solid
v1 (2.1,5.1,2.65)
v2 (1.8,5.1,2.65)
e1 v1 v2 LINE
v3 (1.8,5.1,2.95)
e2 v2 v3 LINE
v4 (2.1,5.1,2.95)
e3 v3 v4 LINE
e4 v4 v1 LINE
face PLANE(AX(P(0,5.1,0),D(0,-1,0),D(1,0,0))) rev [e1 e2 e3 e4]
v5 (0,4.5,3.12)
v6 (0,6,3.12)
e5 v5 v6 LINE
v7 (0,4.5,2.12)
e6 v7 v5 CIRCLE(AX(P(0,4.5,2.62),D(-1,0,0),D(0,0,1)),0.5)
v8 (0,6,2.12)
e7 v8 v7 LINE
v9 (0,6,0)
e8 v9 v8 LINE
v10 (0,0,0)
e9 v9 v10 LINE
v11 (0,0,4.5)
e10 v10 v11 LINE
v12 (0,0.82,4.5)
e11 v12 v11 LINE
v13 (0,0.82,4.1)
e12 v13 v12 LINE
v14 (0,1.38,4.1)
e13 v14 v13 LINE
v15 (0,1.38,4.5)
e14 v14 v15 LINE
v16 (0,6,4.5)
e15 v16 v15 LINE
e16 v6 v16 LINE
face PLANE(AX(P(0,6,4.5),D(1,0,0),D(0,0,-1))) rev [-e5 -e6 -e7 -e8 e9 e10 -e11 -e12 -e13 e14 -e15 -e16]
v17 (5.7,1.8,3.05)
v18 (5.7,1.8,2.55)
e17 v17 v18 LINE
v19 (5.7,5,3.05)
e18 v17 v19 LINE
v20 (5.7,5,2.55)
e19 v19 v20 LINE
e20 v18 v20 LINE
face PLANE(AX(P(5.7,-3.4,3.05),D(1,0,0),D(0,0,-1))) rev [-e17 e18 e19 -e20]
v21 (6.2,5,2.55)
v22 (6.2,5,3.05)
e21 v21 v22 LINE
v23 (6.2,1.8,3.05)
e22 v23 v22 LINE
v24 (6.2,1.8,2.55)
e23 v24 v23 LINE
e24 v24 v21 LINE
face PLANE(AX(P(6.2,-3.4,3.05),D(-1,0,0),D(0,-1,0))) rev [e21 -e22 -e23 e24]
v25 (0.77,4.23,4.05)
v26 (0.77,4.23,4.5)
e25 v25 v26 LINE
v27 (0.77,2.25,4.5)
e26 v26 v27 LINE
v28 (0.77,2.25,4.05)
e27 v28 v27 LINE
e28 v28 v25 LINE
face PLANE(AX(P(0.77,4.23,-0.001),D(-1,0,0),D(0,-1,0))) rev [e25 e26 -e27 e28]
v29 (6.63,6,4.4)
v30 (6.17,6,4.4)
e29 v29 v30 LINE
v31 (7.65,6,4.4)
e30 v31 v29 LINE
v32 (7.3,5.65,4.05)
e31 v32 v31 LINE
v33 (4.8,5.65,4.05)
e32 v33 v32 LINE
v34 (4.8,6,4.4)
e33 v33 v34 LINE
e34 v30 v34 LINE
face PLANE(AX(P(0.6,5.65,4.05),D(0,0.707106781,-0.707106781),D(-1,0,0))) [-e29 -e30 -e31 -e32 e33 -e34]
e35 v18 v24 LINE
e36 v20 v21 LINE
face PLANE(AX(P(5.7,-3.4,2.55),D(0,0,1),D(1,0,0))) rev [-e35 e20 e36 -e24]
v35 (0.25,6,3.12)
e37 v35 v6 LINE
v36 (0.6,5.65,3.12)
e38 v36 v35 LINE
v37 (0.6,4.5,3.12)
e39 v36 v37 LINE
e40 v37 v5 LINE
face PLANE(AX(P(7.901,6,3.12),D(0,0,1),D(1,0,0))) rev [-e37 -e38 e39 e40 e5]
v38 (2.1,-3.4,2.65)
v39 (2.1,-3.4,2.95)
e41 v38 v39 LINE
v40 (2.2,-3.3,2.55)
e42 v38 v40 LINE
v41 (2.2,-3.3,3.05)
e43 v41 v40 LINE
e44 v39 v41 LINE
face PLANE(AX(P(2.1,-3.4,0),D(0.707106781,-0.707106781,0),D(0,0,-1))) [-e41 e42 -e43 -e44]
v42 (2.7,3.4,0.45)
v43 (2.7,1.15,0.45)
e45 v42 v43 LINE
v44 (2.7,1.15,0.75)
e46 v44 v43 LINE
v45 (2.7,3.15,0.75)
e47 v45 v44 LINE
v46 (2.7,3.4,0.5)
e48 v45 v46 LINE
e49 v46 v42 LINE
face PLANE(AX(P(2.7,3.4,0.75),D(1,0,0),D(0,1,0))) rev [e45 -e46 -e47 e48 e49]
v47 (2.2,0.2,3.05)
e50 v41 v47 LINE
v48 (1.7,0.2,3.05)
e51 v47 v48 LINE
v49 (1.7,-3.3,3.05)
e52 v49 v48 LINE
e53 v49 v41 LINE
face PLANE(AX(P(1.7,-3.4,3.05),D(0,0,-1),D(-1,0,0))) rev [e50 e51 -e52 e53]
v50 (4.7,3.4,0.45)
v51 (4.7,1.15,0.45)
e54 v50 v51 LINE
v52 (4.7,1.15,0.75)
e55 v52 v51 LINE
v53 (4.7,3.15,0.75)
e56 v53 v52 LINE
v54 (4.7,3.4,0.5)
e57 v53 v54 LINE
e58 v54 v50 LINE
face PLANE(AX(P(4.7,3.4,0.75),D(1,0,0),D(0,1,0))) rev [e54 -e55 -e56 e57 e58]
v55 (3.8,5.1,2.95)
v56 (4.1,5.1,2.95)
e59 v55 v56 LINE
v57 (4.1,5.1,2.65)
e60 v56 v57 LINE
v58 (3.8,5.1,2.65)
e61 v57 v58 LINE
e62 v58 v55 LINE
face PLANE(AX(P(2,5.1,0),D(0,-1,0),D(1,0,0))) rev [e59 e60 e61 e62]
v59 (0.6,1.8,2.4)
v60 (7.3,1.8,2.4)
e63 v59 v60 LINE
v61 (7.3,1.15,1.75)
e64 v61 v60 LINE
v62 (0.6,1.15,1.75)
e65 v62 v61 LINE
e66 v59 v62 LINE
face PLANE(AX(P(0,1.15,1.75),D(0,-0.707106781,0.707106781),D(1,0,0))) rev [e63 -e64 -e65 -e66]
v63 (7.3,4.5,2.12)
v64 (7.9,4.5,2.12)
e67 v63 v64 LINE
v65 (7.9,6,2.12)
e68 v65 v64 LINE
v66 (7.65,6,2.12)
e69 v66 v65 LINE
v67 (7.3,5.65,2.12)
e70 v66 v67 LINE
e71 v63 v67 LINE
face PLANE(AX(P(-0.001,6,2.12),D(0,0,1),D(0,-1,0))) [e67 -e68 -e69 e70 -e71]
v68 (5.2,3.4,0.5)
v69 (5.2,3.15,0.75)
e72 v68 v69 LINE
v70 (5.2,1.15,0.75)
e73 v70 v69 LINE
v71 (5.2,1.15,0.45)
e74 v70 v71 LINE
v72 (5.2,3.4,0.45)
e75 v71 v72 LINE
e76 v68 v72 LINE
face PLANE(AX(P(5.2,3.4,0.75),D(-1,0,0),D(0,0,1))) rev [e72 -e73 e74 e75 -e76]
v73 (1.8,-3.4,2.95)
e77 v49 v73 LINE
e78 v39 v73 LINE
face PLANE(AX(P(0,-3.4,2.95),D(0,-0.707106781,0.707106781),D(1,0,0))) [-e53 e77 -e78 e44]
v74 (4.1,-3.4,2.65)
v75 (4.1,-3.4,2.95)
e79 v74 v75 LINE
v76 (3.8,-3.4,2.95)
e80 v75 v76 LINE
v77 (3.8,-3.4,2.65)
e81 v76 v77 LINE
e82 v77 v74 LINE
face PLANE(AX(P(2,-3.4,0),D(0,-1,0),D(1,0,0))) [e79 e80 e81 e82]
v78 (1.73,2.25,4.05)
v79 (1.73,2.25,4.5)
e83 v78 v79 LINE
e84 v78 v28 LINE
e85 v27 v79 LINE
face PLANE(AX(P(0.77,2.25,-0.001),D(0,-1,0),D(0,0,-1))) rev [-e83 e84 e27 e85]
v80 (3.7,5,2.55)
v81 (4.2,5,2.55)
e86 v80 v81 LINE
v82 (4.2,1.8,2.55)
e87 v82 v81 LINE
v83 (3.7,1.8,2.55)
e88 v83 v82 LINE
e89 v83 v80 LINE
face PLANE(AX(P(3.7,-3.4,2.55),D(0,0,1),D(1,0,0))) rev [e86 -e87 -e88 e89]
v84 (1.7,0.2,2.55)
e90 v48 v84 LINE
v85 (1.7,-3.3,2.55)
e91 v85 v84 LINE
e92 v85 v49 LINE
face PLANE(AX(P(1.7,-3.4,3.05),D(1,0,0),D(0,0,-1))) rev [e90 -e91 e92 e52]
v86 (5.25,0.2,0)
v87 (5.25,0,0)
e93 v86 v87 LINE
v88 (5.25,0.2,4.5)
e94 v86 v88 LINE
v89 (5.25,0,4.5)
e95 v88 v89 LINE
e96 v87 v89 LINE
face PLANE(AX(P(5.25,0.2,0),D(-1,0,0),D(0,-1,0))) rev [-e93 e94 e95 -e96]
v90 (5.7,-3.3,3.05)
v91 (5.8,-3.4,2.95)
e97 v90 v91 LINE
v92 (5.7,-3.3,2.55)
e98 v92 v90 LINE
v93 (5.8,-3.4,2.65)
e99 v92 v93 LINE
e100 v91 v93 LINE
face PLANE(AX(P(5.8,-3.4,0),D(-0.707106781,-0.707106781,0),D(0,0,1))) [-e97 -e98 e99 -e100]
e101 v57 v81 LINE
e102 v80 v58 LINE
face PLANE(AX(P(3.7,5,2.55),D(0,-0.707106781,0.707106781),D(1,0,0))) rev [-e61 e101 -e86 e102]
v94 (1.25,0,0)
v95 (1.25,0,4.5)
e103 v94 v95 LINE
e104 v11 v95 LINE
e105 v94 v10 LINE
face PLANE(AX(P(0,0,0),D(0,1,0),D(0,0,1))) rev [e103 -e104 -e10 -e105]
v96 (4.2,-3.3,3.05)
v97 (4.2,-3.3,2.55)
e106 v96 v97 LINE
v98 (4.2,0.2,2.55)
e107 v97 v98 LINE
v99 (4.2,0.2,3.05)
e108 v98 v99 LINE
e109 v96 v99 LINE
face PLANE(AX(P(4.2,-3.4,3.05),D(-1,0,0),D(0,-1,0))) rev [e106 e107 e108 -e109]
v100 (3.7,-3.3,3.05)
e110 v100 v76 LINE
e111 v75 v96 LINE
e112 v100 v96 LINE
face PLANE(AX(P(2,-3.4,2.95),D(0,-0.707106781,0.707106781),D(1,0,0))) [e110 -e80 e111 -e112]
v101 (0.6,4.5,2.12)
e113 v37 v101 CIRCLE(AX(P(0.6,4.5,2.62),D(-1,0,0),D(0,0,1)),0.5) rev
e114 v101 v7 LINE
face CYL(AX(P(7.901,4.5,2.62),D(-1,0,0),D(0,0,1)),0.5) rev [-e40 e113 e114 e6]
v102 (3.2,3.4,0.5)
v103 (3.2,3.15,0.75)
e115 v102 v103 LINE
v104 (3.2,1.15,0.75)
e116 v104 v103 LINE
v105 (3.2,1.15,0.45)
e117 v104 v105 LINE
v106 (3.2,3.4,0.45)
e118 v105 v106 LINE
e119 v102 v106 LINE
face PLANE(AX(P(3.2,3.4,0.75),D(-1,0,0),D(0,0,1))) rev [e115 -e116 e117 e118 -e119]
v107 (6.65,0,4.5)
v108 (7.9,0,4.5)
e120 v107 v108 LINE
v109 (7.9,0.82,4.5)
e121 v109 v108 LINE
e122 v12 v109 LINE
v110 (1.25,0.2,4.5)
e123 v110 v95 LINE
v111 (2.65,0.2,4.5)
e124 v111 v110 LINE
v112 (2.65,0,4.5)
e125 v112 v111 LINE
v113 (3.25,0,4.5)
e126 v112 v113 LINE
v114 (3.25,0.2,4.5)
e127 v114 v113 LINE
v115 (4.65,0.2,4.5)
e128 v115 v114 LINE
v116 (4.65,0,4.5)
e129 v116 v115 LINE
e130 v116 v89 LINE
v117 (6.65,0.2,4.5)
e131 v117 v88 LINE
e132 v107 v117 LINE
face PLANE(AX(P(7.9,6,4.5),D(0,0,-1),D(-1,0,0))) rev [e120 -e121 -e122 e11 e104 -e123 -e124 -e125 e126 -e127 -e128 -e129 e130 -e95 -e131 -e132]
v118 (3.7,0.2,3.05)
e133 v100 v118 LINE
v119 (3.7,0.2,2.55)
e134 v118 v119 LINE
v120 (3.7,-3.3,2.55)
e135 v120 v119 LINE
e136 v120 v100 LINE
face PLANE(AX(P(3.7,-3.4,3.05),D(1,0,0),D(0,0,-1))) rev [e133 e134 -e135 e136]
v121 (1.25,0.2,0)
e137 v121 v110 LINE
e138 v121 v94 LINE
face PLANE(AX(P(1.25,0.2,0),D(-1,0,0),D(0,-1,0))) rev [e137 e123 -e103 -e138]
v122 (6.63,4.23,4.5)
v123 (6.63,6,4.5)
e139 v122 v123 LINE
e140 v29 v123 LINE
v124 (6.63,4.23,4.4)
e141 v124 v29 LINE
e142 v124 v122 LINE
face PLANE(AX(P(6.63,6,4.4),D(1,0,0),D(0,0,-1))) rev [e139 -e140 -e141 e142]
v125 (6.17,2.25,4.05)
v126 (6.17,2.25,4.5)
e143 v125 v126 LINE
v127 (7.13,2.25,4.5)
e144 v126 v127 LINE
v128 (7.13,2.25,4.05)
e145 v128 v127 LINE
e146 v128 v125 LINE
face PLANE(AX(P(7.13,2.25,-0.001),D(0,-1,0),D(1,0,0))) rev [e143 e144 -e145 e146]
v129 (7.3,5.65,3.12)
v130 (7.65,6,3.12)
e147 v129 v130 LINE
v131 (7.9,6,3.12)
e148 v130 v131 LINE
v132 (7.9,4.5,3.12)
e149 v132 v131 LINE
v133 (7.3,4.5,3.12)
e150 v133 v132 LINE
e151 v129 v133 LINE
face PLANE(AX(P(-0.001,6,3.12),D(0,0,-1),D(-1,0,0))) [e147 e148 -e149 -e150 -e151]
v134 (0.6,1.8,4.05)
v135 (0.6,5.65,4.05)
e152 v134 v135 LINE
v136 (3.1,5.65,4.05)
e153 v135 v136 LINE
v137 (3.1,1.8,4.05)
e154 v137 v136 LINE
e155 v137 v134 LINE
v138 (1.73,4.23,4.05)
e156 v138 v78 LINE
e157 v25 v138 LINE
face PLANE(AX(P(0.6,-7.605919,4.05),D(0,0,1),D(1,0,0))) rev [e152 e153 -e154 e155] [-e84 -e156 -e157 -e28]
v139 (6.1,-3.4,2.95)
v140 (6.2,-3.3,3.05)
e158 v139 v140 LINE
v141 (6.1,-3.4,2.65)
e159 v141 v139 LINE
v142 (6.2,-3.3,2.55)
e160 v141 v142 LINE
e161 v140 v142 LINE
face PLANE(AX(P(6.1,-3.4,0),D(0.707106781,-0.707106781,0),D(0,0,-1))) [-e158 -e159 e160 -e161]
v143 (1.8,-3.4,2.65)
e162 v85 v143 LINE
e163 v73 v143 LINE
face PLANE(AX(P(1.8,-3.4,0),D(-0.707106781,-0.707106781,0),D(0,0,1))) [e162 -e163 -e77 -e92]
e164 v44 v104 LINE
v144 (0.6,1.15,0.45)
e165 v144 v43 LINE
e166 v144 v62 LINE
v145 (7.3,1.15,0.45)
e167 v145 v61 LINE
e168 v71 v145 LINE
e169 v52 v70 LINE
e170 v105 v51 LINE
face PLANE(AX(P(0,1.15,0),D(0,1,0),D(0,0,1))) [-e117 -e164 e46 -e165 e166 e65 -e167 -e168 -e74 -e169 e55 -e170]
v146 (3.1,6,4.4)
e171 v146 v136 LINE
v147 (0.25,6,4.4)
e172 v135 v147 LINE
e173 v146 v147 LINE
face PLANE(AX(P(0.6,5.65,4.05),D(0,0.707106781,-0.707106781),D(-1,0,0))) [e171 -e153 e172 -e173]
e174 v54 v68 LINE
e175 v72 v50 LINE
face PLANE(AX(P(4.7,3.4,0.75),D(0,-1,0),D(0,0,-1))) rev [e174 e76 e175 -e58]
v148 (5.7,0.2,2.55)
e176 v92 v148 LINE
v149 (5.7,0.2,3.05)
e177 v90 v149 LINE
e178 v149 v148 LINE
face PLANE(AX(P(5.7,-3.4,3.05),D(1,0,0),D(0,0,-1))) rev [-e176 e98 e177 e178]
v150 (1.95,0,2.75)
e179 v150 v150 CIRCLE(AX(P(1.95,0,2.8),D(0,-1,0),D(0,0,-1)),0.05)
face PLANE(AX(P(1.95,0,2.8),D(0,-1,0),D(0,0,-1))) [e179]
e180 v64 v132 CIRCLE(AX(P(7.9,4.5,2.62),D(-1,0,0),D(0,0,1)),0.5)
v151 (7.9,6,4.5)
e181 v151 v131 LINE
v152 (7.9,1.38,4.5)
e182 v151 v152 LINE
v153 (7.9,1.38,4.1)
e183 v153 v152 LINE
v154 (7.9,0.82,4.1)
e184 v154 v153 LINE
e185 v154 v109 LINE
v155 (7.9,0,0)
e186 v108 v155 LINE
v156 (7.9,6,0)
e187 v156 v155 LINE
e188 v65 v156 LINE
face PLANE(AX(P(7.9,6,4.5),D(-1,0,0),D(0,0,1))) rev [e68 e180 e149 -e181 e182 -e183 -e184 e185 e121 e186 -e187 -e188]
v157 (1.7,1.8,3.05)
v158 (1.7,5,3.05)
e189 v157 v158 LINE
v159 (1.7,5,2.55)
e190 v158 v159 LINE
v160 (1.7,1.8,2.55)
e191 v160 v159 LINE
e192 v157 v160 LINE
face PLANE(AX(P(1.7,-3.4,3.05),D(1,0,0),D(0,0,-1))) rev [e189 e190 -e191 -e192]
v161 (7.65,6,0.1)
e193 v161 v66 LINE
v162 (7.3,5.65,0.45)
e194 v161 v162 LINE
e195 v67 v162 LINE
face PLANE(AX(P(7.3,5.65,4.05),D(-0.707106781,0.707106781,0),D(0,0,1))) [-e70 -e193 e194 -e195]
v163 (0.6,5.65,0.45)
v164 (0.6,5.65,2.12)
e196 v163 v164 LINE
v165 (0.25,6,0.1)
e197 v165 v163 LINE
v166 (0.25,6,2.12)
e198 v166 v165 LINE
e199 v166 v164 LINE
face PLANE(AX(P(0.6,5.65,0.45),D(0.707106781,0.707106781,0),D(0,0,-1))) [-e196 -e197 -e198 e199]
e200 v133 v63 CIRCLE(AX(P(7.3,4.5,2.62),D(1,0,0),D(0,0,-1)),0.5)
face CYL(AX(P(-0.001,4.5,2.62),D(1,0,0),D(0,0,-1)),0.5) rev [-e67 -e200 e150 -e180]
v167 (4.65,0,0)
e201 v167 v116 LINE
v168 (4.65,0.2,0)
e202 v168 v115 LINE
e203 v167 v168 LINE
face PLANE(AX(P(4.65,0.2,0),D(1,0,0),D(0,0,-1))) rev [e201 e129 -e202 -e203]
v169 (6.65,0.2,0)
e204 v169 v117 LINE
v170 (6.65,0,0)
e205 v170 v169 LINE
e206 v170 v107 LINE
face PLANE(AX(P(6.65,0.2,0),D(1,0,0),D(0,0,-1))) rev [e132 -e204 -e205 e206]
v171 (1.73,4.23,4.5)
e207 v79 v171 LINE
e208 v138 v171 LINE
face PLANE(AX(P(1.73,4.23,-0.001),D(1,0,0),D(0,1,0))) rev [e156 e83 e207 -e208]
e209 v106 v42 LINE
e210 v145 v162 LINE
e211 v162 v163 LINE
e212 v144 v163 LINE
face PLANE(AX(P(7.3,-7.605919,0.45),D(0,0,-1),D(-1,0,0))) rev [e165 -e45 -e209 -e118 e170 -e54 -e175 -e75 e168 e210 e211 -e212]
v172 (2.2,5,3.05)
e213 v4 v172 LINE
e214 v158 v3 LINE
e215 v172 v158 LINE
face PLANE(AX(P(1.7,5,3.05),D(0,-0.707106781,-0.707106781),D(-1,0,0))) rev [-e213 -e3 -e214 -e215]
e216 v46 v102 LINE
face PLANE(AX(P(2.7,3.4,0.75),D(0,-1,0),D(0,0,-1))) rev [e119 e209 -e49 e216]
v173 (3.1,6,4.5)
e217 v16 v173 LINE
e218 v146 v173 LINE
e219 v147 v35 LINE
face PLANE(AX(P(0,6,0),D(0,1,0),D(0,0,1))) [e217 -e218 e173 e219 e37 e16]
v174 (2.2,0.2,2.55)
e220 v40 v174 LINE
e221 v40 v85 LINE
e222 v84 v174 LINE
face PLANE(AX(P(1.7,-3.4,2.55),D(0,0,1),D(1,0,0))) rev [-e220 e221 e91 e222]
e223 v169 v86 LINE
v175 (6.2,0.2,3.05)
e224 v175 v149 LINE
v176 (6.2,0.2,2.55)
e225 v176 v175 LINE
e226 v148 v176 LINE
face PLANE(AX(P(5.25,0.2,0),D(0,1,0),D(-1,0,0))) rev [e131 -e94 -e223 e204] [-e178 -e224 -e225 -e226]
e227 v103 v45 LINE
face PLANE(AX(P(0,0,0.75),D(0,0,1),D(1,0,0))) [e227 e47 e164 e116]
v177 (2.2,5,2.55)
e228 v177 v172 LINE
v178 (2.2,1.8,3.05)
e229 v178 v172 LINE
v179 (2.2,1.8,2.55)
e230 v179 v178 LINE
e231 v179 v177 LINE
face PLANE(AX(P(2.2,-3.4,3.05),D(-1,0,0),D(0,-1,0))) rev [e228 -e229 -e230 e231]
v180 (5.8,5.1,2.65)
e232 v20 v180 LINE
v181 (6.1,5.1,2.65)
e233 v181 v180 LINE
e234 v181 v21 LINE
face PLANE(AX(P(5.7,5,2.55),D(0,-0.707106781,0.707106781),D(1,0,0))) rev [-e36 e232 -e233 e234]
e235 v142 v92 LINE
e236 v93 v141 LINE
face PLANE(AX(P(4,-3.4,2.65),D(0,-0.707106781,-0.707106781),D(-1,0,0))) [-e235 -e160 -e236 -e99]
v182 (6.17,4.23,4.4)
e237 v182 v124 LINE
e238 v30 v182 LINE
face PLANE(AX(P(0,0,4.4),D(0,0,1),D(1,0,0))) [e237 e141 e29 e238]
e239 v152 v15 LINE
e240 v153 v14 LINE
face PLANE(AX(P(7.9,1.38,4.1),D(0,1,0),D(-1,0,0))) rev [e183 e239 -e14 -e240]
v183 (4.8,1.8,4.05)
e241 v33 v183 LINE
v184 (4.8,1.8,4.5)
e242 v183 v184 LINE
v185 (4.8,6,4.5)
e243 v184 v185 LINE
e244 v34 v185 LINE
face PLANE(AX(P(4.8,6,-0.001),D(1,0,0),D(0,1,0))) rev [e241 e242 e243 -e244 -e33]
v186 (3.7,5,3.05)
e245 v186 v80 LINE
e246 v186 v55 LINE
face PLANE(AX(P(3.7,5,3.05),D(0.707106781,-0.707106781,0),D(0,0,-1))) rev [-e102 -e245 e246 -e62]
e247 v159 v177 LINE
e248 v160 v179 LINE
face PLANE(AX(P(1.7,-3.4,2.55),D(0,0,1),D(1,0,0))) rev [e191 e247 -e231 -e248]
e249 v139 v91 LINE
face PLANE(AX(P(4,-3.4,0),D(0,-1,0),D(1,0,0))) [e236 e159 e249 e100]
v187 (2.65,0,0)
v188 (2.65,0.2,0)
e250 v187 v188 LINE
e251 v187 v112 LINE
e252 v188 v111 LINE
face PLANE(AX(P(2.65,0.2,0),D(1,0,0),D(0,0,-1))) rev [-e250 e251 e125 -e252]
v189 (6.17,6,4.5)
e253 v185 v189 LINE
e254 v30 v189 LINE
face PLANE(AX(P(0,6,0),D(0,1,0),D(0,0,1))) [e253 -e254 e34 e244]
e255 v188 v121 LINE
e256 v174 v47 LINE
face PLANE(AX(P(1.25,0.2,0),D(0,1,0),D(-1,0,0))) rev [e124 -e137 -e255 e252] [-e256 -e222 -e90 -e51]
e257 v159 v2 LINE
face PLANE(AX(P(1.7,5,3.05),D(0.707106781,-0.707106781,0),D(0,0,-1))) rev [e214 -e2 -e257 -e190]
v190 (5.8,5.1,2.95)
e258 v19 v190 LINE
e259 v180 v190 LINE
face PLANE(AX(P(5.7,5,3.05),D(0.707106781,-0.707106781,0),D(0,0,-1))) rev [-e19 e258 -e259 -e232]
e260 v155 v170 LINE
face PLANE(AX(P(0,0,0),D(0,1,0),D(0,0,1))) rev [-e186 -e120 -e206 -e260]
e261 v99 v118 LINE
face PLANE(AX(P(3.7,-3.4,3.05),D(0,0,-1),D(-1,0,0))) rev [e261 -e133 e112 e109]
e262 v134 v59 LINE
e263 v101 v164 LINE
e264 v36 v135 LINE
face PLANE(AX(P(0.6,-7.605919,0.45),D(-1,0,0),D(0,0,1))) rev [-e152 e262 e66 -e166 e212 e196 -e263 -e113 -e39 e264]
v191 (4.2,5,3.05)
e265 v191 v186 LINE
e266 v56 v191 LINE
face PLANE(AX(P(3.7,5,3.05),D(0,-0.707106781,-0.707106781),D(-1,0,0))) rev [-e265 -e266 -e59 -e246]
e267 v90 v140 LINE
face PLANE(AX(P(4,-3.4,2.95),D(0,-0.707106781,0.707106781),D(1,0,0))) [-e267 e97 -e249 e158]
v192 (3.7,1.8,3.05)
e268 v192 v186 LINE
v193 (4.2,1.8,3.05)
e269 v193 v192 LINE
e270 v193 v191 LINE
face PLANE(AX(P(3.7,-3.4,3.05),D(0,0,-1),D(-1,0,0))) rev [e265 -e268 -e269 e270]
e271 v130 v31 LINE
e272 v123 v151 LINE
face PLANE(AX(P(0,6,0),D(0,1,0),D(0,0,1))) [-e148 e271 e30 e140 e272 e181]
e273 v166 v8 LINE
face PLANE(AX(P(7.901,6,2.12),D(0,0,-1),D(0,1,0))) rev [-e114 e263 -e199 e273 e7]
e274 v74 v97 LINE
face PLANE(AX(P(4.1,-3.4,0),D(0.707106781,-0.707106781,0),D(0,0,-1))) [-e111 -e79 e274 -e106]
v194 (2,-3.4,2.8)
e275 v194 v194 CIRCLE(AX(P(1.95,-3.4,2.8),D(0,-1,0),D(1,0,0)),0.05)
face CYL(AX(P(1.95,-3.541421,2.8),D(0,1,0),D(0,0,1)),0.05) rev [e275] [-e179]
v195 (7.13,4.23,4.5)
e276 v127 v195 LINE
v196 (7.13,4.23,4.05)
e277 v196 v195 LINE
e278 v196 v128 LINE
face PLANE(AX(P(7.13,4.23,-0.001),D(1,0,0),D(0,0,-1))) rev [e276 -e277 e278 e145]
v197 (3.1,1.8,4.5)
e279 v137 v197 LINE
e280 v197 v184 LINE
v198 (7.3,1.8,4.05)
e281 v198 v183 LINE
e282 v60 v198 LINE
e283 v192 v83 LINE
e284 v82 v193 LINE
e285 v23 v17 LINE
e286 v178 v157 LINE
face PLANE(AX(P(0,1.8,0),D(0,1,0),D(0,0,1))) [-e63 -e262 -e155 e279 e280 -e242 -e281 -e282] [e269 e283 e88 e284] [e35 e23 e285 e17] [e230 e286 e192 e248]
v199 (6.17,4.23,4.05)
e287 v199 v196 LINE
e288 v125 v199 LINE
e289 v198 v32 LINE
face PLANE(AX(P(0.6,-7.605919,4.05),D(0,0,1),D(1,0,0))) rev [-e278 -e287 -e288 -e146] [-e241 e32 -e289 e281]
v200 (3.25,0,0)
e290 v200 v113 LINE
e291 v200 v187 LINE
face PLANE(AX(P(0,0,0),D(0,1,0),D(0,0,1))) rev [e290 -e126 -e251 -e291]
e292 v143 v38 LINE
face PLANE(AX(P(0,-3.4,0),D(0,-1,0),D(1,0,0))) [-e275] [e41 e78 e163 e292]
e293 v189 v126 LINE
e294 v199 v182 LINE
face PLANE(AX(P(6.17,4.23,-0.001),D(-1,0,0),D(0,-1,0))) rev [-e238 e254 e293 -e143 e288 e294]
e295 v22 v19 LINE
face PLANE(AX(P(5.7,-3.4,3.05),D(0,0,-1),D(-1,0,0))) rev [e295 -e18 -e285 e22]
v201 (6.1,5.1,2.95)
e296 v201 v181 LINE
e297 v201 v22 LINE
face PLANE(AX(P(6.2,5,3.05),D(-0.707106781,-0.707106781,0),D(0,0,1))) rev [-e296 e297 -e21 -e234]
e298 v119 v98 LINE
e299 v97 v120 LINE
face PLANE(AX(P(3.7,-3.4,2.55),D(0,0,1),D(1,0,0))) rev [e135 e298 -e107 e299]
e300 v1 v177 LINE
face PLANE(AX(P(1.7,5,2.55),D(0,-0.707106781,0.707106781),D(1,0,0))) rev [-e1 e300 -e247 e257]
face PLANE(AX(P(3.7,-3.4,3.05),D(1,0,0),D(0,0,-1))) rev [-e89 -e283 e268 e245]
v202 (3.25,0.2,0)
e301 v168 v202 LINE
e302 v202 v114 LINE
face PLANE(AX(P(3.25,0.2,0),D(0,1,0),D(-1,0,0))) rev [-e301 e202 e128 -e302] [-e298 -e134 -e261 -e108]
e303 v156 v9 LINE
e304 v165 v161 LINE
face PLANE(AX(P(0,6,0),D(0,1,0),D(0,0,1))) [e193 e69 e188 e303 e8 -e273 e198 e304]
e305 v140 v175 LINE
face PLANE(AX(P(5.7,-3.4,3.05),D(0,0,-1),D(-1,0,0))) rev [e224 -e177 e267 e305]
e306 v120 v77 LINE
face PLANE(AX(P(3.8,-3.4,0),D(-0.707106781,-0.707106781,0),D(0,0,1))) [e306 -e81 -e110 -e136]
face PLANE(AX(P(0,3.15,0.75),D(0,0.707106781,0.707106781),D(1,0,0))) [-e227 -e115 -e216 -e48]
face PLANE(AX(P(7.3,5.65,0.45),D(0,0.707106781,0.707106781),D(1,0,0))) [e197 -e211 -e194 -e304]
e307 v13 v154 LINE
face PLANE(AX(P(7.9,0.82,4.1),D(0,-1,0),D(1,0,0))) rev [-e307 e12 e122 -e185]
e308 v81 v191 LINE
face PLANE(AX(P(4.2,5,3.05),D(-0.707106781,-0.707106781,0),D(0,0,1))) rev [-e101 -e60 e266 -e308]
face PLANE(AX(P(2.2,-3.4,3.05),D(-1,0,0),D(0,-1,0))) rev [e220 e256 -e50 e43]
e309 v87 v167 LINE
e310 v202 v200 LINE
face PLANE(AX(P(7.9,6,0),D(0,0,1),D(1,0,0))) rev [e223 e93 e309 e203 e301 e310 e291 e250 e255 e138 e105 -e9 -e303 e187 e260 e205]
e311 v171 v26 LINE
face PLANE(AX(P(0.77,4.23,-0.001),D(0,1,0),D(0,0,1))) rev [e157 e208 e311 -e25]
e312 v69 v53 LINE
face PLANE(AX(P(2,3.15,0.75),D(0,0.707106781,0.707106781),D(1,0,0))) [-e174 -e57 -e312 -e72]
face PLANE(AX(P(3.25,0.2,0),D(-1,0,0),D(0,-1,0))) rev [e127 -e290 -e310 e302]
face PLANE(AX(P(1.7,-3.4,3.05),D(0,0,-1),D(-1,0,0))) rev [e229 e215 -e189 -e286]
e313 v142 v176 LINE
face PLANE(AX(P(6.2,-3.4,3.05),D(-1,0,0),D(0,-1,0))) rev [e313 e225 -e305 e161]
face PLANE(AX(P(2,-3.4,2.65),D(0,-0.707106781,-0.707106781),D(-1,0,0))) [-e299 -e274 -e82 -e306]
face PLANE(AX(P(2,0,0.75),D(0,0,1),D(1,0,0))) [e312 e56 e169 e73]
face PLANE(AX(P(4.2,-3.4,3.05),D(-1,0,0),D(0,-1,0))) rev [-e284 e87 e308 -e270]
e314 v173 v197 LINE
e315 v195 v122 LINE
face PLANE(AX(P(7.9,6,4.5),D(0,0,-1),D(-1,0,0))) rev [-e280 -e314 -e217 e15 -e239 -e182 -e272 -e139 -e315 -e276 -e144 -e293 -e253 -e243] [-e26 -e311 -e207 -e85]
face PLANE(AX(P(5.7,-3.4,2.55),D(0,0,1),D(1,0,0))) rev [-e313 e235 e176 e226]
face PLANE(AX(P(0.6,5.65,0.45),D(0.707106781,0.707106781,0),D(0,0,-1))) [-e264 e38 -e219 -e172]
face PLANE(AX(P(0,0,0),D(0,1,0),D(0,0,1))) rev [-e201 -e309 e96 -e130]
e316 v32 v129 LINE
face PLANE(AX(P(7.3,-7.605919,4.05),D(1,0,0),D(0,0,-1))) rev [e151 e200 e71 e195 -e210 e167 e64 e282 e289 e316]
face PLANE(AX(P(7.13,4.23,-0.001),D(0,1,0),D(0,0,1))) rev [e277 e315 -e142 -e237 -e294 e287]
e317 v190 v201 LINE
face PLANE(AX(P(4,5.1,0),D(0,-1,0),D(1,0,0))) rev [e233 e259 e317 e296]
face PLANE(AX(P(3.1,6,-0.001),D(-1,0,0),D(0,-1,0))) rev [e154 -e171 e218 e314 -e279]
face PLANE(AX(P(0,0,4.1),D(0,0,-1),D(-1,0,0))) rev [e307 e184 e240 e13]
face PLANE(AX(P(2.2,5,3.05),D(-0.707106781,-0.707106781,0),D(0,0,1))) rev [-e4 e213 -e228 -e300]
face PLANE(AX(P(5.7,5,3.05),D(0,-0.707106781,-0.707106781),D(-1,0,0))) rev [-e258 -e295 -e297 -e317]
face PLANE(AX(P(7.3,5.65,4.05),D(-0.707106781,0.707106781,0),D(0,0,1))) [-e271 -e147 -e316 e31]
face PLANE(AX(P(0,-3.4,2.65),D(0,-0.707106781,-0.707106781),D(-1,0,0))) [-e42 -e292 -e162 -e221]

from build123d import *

# Parameters (mm, degrees)
BODY1_W                            = 7.9
BODY1_H                            = 4.5
EXTRUDE_1_DEPTH                    = 6
SKETCH_2_W                         = 6.7
SKETCH_2_H                         = 3.6
CUT_EXTRUDE_1_DEPTH                = 4.2
SKETCH_3_W                         = 7.9
SKETCH_3_H                         = 0.56
CUT_EXTRUDE_2_DEPTH                = 0.4
CHAMFER_1_SIZE                     = 0.35
CUT_EXTRUDE_3_REACH                = 12.893
SKETCH_4_W                         = 0.96
SKETCH_4_H                         = 1.98
SKETCH_5_W                         = 1.4
SKETCH_5_H                         = 0.2
CUT_EXTRUDE_4_DEPTH                = 11.893117093
SKETCH_7_W                         = 0.46
SKETCH_7_H                         = 1.77
CUT_EXTRUDE_5_DEPTH                = 0.1
CUT_EXTRUDE_6_REACH                = 12.893
SKETCH_8_W                         = 1.7
SKETCH_8_H                         = 4.2
CUT_EXTRUDE_7_REACH                = 12.893
SKETCH_15_W                        = 6.7
SKETCH_15_H                        = 1.95
CUT_EXTRUDE_9_DEPTH                = 0.65
CHAMFER_7_SIZE                     = 0.65
SKETCH_10_W                        = 0.5
SKETCH_10_H                        = 2.25
EXTRUDE_2_DEPTH                    = 0.3
CHAMFER_2_SIZE                     = 0.25
PATTERN_LINEAR_3_COUNT             = 2
PATTERN_LINEAR_3_PITCH             = 2
CHAMFER_2_OF_PATTERN_LINEAR_3_SIZE = 0.25
EXTRUDE_START                      = -4.9
SKETCH_12_W                        = 0.5
SKETCH_12_H                        = 0.5
EXTRUDE_4_DEPTH                    = 8.5
CHAMFER_3_SIZE                     = 0.1
CHAMFER_4_SIZE                     = 0.1
PATTERN_LINEAR_2_COUNT             = 3
PATTERN_LINEAR_2_PITCH             = 2
CHAMFER_3_OF_PATTERN_LINEAR_2_SIZE = 0.1
CHAMFER_4_OF_PATTERN_LINEAR_2_SIZE = 0.1
SKETCH_16_R                        = 0.05
CUT_EXTRUDE_10_DEPTH               = 3.4


with BuildPart() as part:
    # Body1 → Бобышка-Вытянуть1 (new body)
    with BuildSketch(Plane(origin=(0, 0, 0), x_dir=(1, 0, 0), z_dir=(0, 1, 0))):
        with Locations((3.95, -2.25)):
            Rectangle(BODY1_W, BODY1_H)
    extrude(amount=EXTRUDE_1_DEPTH)

    # Эскиз2 → Вырез-Вытянуть1 (cut)
    with BuildSketch(Plane(origin=(0, 6, 0), x_dir=(1, 0, 0), z_dir=(0, 1, 0))):
        with Locations((3.95, -2.25)):
            Rectangle(SKETCH_2_W, SKETCH_2_H)
    extrude(amount=-CUT_EXTRUDE_1_DEPTH, mode=Mode.SUBTRACT)

    # Эскиз3 → Вырез-Вытянуть2 (cut)
    with BuildSketch(Plane.XY.offset(4.5)):
        with Locations((3.95, 1.1)):
            Rectangle(SKETCH_3_W, SKETCH_3_H)
    extrude(amount=-CUT_EXTRUDE_2_DEPTH, mode=Mode.SUBTRACT)

    # Фаска1
    chamfer_1_edges = [part.edges().sort_by_distance(p)[0] for p in [
        (3.95, 6, 4.05),
        (7.3, 6, 2.25),
        (3.95, 6, 0.45),
        (0.6, 6, 2.25),
    ]]
    chamfer(chamfer_1_edges, length=CHAMFER_1_SIZE)

    # Эскиз4 → Вырез-Вытянуть3 (cut, up to next)
    with BuildSketch(Plane.XY.offset(4.5), mode=Mode.PRIVATE) as cut_extrude_3_sk1:
        with Locations((1.25, 3.24)):
            Rectangle(SKETCH_4_W, SKETCH_4_H)
    cut_extrude_3_tool1 = extrude(cut_extrude_3_sk1.sketch, amount=-CUT_EXTRUDE_3_REACH, mode=Mode.PRIVATE) & part.part
    # Эскиз4 → Вырез-Вытянуть3 (cut, up to next)
    with BuildSketch(Plane.XY.offset(4.5), mode=Mode.PRIVATE) as cut_extrude_3_sk2:
        with Locations((6.65, 3.24)):
            Rectangle(SKETCH_4_W, SKETCH_4_H)
    cut_extrude_3_tool2 = extrude(cut_extrude_3_sk2.sketch, amount=-CUT_EXTRUDE_3_REACH, mode=Mode.PRIVATE) & part.part
    add(cut_extrude_3_tool1.solids().sort_by_distance((1.25, 3.24, 4.5))[0], mode=Mode.SUBTRACT)
    add(cut_extrude_3_tool2.solids().sort_by_distance((6.65, 3.24, 4.5))[0], mode=Mode.SUBTRACT)

    # Эскиз5 → Вырез-Вытянуть4 (cut, through all)
    with BuildSketch(Plane.XY.offset(4.5)):
        with Locations((1.95, 0.1)):
            Rectangle(SKETCH_5_W, SKETCH_5_H)
    cut_extrude_4 = extrude(amount=-CUT_EXTRUDE_4_DEPTH, mode=Mode.SUBTRACT)

    # Эскиз7 → Вырез-Вытянуть5 (cut)
    with BuildSketch(Plane.XY.offset(4.5)):
        with Locations((6.4, 5.115)):
            Rectangle(SKETCH_7_W, SKETCH_7_H)
    extrude(amount=-CUT_EXTRUDE_5_DEPTH, mode=Mode.SUBTRACT)

    # Эскиз8 → Вырез-Вытянуть6 (cut, up to next)
    with BuildSketch(Plane.XY.offset(4.5), mode=Mode.PRIVATE) as cut_extrude_6_sk1:
        with Locations((3.95, 3.9)):
            Rectangle(SKETCH_8_W, SKETCH_8_H)
    cut_extrude_6_tool1 = extrude(cut_extrude_6_sk1.sketch, amount=-CUT_EXTRUDE_6_REACH, mode=Mode.PRIVATE) & part.part
    add(cut_extrude_6_tool1.solids().sort_by_distance((3.95, 3.9, 4.5))[0], mode=Mode.SUBTRACT)

    # Эскиз9 → Вырез-Вытянуть7 (cut, up to next)
    with BuildSketch(Plane.ZY, mode=Mode.PRIVATE) as cut_extrude_7_sk1:
        with BuildLine():
            Line((2.12, 6), (3.12, 6))
            Line((3.12, 6), (3.12, 4.5))
            ThreePointArc((3.12, 4.5), (2.62, 4), (2.12, 4.5))
            Line((2.12, 4.5), (2.12, 6))
        make_face()
    cut_extrude_7_tool1 = extrude(cut_extrude_7_sk1.sketch, amount=-CUT_EXTRUDE_7_REACH, mode=Mode.PRIVATE) & part.part
    cut_extrude_7 = cut_extrude_7_tool1.solids().sort_by_distance((0, 5.05036, 2.62))[0]
    add(cut_extrude_7, mode=Mode.SUBTRACT)

    # Зеркальное отражение1: Вырез-Вытянуть7 across plane
    add(cut_extrude_7.mirror(Plane(origin=(3.95, 0, 0), x_dir=(0, 0, 1), z_dir=(1, 0, 0))), mode=Mode.SUBTRACT)

    # Эскиз15 → Вырез-Вытянуть9 (cut)
    with BuildSketch(Plane(origin=(0, 1.8, 0), x_dir=(1, 0, 0), z_dir=(0, 1, 0))):
        with Locations((3.95, -1.425)):
            Rectangle(SKETCH_15_W, SKETCH_15_H)
    extrude(amount=-CUT_EXTRUDE_9_DEPTH, mode=Mode.SUBTRACT)

    # Фаска7
    chamfer_7_edges = [part.edges().sort_by_distance(p)[0] for p in [
        (3.95, 1.15, 2.4),
    ]]
    chamfer(chamfer_7_edges, length=CHAMFER_7_SIZE - 0.0001)  # a hair under: the kernel refuses the full size

    # Эскиз10 → Бобышка-Вытянуть2 (add)
    with BuildSketch(Plane.XY.offset(0.45)):
        with Locations((2.95, 2.275)):
            Rectangle(SKETCH_10_W, SKETCH_10_H)
    extrude_2 = extrude(amount=EXTRUDE_2_DEPTH)

    # Фаска2
    chamfer_2_edges = [part.edges().sort_by_distance(p)[0] for p in [
        (2.95, 3.4, 0.75),
    ]]
    chamfer(chamfer_2_edges, length=CHAMFER_2_SIZE)

    # Линейный массив3: Бобышка-Вытянуть2 ×2
    with Locations(*[(i * PATTERN_LINEAR_3_PITCH, 0, 0) for i in range(1, PATTERN_LINEAR_3_COUNT)]):
        add(extrude_2)

    # Фаска2 of Линейный массив3
    chamfer_2_of_pattern_linear_3_edges = [part.edges().sort_by_distance(p)[0] for p in [
        (4.95, 3.4, 0.75),
    ]]
    chamfer(chamfer_2_of_pattern_linear_3_edges, length=CHAMFER_2_OF_PATTERN_LINEAR_3_SIZE)

    # Эскиз12 → Бобышка-Вытянуть4 (add)
    with BuildSketch(Plane.XZ.offset(-0.2).offset(EXTRUDE_START)):
        with Locations((1.95, 2.8)):
            Rectangle(SKETCH_12_W, SKETCH_12_H)
    extrude_4 = extrude(amount=EXTRUDE_4_DEPTH)

    # Фаска3
    chamfer_3_edges = [part.edges().sort_by_distance(p)[0] for p in [
        (1.7, -3.4, 2.8),
        (1.95, -3.4, 2.55),
        (2.2, -3.4, 2.8),
        (1.95, -3.4, 3.05),
    ]]
    chamfer(chamfer_3_edges, length=CHAMFER_3_SIZE)

    # Фаска4
    chamfer_4_edges = [part.edges().sort_by_distance(p)[0] for p in [
        (1.7, 5.1, 2.8),
        (1.95, 5.1, 2.55),
        (2.2, 5.1, 2.8),
        (1.95, 5.1, 3.05),
    ]]
    chamfer(chamfer_4_edges, length=CHAMFER_4_SIZE)

    # Линейный массив2: Вырез-Вытянуть4, Бобышка-Вытянуть4 ×3
    with Locations(*[(i * PATTERN_LINEAR_2_PITCH, 0, 0) for i in range(1, PATTERN_LINEAR_2_COUNT)]):
        add(cut_extrude_4, mode=Mode.SUBTRACT)
        add(extrude_4)

    # Фаска3 of Линейный массив2
    chamfer_3_of_pattern_linear_2_edges = [part.edges().sort_by_distance(p)[0] for p in [
        (3.7, -3.4, 2.8),
        (3.95, -3.4, 2.55),
        (4.2, -3.4, 2.8),
        (3.95, -3.4, 3.05),
        (5.7, -3.4, 2.8),
        (5.95, -3.4, 2.55),
        (6.2, -3.4, 2.8),
        (5.95, -3.4, 3.05),
    ]]
    chamfer(chamfer_3_of_pattern_linear_2_edges, length=CHAMFER_3_OF_PATTERN_LINEAR_2_SIZE)

    # Фаска4 of Линейный массив2
    chamfer_4_of_pattern_linear_2_edges = [part.edges().sort_by_distance(p)[0] for p in [
        (3.7, 5.1, 2.8),
        (3.95, 5.1, 2.55),
        (4.2, 5.1, 2.8),
        (3.95, 5.1, 3.05),
        (5.7, 5.1, 2.8),
        (5.95, 5.1, 2.55),
        (6.2, 5.1, 2.8),
        (5.95, 5.1, 3.05),
    ]]
    chamfer(chamfer_4_of_pattern_linear_2_edges, length=CHAMFER_4_OF_PATTERN_LINEAR_2_SIZE)

    # Эскиз16 → Вырез-Вытянуть10 (cut)
    with BuildSketch(Plane.XZ):
        with Locations((1.95, 2.8)):
            Circle(SKETCH_16_R)
    extrude(amount=CUT_EXTRUDE_10_DEPTH, mode=Mode.SUBTRACT)


solid = part.part
